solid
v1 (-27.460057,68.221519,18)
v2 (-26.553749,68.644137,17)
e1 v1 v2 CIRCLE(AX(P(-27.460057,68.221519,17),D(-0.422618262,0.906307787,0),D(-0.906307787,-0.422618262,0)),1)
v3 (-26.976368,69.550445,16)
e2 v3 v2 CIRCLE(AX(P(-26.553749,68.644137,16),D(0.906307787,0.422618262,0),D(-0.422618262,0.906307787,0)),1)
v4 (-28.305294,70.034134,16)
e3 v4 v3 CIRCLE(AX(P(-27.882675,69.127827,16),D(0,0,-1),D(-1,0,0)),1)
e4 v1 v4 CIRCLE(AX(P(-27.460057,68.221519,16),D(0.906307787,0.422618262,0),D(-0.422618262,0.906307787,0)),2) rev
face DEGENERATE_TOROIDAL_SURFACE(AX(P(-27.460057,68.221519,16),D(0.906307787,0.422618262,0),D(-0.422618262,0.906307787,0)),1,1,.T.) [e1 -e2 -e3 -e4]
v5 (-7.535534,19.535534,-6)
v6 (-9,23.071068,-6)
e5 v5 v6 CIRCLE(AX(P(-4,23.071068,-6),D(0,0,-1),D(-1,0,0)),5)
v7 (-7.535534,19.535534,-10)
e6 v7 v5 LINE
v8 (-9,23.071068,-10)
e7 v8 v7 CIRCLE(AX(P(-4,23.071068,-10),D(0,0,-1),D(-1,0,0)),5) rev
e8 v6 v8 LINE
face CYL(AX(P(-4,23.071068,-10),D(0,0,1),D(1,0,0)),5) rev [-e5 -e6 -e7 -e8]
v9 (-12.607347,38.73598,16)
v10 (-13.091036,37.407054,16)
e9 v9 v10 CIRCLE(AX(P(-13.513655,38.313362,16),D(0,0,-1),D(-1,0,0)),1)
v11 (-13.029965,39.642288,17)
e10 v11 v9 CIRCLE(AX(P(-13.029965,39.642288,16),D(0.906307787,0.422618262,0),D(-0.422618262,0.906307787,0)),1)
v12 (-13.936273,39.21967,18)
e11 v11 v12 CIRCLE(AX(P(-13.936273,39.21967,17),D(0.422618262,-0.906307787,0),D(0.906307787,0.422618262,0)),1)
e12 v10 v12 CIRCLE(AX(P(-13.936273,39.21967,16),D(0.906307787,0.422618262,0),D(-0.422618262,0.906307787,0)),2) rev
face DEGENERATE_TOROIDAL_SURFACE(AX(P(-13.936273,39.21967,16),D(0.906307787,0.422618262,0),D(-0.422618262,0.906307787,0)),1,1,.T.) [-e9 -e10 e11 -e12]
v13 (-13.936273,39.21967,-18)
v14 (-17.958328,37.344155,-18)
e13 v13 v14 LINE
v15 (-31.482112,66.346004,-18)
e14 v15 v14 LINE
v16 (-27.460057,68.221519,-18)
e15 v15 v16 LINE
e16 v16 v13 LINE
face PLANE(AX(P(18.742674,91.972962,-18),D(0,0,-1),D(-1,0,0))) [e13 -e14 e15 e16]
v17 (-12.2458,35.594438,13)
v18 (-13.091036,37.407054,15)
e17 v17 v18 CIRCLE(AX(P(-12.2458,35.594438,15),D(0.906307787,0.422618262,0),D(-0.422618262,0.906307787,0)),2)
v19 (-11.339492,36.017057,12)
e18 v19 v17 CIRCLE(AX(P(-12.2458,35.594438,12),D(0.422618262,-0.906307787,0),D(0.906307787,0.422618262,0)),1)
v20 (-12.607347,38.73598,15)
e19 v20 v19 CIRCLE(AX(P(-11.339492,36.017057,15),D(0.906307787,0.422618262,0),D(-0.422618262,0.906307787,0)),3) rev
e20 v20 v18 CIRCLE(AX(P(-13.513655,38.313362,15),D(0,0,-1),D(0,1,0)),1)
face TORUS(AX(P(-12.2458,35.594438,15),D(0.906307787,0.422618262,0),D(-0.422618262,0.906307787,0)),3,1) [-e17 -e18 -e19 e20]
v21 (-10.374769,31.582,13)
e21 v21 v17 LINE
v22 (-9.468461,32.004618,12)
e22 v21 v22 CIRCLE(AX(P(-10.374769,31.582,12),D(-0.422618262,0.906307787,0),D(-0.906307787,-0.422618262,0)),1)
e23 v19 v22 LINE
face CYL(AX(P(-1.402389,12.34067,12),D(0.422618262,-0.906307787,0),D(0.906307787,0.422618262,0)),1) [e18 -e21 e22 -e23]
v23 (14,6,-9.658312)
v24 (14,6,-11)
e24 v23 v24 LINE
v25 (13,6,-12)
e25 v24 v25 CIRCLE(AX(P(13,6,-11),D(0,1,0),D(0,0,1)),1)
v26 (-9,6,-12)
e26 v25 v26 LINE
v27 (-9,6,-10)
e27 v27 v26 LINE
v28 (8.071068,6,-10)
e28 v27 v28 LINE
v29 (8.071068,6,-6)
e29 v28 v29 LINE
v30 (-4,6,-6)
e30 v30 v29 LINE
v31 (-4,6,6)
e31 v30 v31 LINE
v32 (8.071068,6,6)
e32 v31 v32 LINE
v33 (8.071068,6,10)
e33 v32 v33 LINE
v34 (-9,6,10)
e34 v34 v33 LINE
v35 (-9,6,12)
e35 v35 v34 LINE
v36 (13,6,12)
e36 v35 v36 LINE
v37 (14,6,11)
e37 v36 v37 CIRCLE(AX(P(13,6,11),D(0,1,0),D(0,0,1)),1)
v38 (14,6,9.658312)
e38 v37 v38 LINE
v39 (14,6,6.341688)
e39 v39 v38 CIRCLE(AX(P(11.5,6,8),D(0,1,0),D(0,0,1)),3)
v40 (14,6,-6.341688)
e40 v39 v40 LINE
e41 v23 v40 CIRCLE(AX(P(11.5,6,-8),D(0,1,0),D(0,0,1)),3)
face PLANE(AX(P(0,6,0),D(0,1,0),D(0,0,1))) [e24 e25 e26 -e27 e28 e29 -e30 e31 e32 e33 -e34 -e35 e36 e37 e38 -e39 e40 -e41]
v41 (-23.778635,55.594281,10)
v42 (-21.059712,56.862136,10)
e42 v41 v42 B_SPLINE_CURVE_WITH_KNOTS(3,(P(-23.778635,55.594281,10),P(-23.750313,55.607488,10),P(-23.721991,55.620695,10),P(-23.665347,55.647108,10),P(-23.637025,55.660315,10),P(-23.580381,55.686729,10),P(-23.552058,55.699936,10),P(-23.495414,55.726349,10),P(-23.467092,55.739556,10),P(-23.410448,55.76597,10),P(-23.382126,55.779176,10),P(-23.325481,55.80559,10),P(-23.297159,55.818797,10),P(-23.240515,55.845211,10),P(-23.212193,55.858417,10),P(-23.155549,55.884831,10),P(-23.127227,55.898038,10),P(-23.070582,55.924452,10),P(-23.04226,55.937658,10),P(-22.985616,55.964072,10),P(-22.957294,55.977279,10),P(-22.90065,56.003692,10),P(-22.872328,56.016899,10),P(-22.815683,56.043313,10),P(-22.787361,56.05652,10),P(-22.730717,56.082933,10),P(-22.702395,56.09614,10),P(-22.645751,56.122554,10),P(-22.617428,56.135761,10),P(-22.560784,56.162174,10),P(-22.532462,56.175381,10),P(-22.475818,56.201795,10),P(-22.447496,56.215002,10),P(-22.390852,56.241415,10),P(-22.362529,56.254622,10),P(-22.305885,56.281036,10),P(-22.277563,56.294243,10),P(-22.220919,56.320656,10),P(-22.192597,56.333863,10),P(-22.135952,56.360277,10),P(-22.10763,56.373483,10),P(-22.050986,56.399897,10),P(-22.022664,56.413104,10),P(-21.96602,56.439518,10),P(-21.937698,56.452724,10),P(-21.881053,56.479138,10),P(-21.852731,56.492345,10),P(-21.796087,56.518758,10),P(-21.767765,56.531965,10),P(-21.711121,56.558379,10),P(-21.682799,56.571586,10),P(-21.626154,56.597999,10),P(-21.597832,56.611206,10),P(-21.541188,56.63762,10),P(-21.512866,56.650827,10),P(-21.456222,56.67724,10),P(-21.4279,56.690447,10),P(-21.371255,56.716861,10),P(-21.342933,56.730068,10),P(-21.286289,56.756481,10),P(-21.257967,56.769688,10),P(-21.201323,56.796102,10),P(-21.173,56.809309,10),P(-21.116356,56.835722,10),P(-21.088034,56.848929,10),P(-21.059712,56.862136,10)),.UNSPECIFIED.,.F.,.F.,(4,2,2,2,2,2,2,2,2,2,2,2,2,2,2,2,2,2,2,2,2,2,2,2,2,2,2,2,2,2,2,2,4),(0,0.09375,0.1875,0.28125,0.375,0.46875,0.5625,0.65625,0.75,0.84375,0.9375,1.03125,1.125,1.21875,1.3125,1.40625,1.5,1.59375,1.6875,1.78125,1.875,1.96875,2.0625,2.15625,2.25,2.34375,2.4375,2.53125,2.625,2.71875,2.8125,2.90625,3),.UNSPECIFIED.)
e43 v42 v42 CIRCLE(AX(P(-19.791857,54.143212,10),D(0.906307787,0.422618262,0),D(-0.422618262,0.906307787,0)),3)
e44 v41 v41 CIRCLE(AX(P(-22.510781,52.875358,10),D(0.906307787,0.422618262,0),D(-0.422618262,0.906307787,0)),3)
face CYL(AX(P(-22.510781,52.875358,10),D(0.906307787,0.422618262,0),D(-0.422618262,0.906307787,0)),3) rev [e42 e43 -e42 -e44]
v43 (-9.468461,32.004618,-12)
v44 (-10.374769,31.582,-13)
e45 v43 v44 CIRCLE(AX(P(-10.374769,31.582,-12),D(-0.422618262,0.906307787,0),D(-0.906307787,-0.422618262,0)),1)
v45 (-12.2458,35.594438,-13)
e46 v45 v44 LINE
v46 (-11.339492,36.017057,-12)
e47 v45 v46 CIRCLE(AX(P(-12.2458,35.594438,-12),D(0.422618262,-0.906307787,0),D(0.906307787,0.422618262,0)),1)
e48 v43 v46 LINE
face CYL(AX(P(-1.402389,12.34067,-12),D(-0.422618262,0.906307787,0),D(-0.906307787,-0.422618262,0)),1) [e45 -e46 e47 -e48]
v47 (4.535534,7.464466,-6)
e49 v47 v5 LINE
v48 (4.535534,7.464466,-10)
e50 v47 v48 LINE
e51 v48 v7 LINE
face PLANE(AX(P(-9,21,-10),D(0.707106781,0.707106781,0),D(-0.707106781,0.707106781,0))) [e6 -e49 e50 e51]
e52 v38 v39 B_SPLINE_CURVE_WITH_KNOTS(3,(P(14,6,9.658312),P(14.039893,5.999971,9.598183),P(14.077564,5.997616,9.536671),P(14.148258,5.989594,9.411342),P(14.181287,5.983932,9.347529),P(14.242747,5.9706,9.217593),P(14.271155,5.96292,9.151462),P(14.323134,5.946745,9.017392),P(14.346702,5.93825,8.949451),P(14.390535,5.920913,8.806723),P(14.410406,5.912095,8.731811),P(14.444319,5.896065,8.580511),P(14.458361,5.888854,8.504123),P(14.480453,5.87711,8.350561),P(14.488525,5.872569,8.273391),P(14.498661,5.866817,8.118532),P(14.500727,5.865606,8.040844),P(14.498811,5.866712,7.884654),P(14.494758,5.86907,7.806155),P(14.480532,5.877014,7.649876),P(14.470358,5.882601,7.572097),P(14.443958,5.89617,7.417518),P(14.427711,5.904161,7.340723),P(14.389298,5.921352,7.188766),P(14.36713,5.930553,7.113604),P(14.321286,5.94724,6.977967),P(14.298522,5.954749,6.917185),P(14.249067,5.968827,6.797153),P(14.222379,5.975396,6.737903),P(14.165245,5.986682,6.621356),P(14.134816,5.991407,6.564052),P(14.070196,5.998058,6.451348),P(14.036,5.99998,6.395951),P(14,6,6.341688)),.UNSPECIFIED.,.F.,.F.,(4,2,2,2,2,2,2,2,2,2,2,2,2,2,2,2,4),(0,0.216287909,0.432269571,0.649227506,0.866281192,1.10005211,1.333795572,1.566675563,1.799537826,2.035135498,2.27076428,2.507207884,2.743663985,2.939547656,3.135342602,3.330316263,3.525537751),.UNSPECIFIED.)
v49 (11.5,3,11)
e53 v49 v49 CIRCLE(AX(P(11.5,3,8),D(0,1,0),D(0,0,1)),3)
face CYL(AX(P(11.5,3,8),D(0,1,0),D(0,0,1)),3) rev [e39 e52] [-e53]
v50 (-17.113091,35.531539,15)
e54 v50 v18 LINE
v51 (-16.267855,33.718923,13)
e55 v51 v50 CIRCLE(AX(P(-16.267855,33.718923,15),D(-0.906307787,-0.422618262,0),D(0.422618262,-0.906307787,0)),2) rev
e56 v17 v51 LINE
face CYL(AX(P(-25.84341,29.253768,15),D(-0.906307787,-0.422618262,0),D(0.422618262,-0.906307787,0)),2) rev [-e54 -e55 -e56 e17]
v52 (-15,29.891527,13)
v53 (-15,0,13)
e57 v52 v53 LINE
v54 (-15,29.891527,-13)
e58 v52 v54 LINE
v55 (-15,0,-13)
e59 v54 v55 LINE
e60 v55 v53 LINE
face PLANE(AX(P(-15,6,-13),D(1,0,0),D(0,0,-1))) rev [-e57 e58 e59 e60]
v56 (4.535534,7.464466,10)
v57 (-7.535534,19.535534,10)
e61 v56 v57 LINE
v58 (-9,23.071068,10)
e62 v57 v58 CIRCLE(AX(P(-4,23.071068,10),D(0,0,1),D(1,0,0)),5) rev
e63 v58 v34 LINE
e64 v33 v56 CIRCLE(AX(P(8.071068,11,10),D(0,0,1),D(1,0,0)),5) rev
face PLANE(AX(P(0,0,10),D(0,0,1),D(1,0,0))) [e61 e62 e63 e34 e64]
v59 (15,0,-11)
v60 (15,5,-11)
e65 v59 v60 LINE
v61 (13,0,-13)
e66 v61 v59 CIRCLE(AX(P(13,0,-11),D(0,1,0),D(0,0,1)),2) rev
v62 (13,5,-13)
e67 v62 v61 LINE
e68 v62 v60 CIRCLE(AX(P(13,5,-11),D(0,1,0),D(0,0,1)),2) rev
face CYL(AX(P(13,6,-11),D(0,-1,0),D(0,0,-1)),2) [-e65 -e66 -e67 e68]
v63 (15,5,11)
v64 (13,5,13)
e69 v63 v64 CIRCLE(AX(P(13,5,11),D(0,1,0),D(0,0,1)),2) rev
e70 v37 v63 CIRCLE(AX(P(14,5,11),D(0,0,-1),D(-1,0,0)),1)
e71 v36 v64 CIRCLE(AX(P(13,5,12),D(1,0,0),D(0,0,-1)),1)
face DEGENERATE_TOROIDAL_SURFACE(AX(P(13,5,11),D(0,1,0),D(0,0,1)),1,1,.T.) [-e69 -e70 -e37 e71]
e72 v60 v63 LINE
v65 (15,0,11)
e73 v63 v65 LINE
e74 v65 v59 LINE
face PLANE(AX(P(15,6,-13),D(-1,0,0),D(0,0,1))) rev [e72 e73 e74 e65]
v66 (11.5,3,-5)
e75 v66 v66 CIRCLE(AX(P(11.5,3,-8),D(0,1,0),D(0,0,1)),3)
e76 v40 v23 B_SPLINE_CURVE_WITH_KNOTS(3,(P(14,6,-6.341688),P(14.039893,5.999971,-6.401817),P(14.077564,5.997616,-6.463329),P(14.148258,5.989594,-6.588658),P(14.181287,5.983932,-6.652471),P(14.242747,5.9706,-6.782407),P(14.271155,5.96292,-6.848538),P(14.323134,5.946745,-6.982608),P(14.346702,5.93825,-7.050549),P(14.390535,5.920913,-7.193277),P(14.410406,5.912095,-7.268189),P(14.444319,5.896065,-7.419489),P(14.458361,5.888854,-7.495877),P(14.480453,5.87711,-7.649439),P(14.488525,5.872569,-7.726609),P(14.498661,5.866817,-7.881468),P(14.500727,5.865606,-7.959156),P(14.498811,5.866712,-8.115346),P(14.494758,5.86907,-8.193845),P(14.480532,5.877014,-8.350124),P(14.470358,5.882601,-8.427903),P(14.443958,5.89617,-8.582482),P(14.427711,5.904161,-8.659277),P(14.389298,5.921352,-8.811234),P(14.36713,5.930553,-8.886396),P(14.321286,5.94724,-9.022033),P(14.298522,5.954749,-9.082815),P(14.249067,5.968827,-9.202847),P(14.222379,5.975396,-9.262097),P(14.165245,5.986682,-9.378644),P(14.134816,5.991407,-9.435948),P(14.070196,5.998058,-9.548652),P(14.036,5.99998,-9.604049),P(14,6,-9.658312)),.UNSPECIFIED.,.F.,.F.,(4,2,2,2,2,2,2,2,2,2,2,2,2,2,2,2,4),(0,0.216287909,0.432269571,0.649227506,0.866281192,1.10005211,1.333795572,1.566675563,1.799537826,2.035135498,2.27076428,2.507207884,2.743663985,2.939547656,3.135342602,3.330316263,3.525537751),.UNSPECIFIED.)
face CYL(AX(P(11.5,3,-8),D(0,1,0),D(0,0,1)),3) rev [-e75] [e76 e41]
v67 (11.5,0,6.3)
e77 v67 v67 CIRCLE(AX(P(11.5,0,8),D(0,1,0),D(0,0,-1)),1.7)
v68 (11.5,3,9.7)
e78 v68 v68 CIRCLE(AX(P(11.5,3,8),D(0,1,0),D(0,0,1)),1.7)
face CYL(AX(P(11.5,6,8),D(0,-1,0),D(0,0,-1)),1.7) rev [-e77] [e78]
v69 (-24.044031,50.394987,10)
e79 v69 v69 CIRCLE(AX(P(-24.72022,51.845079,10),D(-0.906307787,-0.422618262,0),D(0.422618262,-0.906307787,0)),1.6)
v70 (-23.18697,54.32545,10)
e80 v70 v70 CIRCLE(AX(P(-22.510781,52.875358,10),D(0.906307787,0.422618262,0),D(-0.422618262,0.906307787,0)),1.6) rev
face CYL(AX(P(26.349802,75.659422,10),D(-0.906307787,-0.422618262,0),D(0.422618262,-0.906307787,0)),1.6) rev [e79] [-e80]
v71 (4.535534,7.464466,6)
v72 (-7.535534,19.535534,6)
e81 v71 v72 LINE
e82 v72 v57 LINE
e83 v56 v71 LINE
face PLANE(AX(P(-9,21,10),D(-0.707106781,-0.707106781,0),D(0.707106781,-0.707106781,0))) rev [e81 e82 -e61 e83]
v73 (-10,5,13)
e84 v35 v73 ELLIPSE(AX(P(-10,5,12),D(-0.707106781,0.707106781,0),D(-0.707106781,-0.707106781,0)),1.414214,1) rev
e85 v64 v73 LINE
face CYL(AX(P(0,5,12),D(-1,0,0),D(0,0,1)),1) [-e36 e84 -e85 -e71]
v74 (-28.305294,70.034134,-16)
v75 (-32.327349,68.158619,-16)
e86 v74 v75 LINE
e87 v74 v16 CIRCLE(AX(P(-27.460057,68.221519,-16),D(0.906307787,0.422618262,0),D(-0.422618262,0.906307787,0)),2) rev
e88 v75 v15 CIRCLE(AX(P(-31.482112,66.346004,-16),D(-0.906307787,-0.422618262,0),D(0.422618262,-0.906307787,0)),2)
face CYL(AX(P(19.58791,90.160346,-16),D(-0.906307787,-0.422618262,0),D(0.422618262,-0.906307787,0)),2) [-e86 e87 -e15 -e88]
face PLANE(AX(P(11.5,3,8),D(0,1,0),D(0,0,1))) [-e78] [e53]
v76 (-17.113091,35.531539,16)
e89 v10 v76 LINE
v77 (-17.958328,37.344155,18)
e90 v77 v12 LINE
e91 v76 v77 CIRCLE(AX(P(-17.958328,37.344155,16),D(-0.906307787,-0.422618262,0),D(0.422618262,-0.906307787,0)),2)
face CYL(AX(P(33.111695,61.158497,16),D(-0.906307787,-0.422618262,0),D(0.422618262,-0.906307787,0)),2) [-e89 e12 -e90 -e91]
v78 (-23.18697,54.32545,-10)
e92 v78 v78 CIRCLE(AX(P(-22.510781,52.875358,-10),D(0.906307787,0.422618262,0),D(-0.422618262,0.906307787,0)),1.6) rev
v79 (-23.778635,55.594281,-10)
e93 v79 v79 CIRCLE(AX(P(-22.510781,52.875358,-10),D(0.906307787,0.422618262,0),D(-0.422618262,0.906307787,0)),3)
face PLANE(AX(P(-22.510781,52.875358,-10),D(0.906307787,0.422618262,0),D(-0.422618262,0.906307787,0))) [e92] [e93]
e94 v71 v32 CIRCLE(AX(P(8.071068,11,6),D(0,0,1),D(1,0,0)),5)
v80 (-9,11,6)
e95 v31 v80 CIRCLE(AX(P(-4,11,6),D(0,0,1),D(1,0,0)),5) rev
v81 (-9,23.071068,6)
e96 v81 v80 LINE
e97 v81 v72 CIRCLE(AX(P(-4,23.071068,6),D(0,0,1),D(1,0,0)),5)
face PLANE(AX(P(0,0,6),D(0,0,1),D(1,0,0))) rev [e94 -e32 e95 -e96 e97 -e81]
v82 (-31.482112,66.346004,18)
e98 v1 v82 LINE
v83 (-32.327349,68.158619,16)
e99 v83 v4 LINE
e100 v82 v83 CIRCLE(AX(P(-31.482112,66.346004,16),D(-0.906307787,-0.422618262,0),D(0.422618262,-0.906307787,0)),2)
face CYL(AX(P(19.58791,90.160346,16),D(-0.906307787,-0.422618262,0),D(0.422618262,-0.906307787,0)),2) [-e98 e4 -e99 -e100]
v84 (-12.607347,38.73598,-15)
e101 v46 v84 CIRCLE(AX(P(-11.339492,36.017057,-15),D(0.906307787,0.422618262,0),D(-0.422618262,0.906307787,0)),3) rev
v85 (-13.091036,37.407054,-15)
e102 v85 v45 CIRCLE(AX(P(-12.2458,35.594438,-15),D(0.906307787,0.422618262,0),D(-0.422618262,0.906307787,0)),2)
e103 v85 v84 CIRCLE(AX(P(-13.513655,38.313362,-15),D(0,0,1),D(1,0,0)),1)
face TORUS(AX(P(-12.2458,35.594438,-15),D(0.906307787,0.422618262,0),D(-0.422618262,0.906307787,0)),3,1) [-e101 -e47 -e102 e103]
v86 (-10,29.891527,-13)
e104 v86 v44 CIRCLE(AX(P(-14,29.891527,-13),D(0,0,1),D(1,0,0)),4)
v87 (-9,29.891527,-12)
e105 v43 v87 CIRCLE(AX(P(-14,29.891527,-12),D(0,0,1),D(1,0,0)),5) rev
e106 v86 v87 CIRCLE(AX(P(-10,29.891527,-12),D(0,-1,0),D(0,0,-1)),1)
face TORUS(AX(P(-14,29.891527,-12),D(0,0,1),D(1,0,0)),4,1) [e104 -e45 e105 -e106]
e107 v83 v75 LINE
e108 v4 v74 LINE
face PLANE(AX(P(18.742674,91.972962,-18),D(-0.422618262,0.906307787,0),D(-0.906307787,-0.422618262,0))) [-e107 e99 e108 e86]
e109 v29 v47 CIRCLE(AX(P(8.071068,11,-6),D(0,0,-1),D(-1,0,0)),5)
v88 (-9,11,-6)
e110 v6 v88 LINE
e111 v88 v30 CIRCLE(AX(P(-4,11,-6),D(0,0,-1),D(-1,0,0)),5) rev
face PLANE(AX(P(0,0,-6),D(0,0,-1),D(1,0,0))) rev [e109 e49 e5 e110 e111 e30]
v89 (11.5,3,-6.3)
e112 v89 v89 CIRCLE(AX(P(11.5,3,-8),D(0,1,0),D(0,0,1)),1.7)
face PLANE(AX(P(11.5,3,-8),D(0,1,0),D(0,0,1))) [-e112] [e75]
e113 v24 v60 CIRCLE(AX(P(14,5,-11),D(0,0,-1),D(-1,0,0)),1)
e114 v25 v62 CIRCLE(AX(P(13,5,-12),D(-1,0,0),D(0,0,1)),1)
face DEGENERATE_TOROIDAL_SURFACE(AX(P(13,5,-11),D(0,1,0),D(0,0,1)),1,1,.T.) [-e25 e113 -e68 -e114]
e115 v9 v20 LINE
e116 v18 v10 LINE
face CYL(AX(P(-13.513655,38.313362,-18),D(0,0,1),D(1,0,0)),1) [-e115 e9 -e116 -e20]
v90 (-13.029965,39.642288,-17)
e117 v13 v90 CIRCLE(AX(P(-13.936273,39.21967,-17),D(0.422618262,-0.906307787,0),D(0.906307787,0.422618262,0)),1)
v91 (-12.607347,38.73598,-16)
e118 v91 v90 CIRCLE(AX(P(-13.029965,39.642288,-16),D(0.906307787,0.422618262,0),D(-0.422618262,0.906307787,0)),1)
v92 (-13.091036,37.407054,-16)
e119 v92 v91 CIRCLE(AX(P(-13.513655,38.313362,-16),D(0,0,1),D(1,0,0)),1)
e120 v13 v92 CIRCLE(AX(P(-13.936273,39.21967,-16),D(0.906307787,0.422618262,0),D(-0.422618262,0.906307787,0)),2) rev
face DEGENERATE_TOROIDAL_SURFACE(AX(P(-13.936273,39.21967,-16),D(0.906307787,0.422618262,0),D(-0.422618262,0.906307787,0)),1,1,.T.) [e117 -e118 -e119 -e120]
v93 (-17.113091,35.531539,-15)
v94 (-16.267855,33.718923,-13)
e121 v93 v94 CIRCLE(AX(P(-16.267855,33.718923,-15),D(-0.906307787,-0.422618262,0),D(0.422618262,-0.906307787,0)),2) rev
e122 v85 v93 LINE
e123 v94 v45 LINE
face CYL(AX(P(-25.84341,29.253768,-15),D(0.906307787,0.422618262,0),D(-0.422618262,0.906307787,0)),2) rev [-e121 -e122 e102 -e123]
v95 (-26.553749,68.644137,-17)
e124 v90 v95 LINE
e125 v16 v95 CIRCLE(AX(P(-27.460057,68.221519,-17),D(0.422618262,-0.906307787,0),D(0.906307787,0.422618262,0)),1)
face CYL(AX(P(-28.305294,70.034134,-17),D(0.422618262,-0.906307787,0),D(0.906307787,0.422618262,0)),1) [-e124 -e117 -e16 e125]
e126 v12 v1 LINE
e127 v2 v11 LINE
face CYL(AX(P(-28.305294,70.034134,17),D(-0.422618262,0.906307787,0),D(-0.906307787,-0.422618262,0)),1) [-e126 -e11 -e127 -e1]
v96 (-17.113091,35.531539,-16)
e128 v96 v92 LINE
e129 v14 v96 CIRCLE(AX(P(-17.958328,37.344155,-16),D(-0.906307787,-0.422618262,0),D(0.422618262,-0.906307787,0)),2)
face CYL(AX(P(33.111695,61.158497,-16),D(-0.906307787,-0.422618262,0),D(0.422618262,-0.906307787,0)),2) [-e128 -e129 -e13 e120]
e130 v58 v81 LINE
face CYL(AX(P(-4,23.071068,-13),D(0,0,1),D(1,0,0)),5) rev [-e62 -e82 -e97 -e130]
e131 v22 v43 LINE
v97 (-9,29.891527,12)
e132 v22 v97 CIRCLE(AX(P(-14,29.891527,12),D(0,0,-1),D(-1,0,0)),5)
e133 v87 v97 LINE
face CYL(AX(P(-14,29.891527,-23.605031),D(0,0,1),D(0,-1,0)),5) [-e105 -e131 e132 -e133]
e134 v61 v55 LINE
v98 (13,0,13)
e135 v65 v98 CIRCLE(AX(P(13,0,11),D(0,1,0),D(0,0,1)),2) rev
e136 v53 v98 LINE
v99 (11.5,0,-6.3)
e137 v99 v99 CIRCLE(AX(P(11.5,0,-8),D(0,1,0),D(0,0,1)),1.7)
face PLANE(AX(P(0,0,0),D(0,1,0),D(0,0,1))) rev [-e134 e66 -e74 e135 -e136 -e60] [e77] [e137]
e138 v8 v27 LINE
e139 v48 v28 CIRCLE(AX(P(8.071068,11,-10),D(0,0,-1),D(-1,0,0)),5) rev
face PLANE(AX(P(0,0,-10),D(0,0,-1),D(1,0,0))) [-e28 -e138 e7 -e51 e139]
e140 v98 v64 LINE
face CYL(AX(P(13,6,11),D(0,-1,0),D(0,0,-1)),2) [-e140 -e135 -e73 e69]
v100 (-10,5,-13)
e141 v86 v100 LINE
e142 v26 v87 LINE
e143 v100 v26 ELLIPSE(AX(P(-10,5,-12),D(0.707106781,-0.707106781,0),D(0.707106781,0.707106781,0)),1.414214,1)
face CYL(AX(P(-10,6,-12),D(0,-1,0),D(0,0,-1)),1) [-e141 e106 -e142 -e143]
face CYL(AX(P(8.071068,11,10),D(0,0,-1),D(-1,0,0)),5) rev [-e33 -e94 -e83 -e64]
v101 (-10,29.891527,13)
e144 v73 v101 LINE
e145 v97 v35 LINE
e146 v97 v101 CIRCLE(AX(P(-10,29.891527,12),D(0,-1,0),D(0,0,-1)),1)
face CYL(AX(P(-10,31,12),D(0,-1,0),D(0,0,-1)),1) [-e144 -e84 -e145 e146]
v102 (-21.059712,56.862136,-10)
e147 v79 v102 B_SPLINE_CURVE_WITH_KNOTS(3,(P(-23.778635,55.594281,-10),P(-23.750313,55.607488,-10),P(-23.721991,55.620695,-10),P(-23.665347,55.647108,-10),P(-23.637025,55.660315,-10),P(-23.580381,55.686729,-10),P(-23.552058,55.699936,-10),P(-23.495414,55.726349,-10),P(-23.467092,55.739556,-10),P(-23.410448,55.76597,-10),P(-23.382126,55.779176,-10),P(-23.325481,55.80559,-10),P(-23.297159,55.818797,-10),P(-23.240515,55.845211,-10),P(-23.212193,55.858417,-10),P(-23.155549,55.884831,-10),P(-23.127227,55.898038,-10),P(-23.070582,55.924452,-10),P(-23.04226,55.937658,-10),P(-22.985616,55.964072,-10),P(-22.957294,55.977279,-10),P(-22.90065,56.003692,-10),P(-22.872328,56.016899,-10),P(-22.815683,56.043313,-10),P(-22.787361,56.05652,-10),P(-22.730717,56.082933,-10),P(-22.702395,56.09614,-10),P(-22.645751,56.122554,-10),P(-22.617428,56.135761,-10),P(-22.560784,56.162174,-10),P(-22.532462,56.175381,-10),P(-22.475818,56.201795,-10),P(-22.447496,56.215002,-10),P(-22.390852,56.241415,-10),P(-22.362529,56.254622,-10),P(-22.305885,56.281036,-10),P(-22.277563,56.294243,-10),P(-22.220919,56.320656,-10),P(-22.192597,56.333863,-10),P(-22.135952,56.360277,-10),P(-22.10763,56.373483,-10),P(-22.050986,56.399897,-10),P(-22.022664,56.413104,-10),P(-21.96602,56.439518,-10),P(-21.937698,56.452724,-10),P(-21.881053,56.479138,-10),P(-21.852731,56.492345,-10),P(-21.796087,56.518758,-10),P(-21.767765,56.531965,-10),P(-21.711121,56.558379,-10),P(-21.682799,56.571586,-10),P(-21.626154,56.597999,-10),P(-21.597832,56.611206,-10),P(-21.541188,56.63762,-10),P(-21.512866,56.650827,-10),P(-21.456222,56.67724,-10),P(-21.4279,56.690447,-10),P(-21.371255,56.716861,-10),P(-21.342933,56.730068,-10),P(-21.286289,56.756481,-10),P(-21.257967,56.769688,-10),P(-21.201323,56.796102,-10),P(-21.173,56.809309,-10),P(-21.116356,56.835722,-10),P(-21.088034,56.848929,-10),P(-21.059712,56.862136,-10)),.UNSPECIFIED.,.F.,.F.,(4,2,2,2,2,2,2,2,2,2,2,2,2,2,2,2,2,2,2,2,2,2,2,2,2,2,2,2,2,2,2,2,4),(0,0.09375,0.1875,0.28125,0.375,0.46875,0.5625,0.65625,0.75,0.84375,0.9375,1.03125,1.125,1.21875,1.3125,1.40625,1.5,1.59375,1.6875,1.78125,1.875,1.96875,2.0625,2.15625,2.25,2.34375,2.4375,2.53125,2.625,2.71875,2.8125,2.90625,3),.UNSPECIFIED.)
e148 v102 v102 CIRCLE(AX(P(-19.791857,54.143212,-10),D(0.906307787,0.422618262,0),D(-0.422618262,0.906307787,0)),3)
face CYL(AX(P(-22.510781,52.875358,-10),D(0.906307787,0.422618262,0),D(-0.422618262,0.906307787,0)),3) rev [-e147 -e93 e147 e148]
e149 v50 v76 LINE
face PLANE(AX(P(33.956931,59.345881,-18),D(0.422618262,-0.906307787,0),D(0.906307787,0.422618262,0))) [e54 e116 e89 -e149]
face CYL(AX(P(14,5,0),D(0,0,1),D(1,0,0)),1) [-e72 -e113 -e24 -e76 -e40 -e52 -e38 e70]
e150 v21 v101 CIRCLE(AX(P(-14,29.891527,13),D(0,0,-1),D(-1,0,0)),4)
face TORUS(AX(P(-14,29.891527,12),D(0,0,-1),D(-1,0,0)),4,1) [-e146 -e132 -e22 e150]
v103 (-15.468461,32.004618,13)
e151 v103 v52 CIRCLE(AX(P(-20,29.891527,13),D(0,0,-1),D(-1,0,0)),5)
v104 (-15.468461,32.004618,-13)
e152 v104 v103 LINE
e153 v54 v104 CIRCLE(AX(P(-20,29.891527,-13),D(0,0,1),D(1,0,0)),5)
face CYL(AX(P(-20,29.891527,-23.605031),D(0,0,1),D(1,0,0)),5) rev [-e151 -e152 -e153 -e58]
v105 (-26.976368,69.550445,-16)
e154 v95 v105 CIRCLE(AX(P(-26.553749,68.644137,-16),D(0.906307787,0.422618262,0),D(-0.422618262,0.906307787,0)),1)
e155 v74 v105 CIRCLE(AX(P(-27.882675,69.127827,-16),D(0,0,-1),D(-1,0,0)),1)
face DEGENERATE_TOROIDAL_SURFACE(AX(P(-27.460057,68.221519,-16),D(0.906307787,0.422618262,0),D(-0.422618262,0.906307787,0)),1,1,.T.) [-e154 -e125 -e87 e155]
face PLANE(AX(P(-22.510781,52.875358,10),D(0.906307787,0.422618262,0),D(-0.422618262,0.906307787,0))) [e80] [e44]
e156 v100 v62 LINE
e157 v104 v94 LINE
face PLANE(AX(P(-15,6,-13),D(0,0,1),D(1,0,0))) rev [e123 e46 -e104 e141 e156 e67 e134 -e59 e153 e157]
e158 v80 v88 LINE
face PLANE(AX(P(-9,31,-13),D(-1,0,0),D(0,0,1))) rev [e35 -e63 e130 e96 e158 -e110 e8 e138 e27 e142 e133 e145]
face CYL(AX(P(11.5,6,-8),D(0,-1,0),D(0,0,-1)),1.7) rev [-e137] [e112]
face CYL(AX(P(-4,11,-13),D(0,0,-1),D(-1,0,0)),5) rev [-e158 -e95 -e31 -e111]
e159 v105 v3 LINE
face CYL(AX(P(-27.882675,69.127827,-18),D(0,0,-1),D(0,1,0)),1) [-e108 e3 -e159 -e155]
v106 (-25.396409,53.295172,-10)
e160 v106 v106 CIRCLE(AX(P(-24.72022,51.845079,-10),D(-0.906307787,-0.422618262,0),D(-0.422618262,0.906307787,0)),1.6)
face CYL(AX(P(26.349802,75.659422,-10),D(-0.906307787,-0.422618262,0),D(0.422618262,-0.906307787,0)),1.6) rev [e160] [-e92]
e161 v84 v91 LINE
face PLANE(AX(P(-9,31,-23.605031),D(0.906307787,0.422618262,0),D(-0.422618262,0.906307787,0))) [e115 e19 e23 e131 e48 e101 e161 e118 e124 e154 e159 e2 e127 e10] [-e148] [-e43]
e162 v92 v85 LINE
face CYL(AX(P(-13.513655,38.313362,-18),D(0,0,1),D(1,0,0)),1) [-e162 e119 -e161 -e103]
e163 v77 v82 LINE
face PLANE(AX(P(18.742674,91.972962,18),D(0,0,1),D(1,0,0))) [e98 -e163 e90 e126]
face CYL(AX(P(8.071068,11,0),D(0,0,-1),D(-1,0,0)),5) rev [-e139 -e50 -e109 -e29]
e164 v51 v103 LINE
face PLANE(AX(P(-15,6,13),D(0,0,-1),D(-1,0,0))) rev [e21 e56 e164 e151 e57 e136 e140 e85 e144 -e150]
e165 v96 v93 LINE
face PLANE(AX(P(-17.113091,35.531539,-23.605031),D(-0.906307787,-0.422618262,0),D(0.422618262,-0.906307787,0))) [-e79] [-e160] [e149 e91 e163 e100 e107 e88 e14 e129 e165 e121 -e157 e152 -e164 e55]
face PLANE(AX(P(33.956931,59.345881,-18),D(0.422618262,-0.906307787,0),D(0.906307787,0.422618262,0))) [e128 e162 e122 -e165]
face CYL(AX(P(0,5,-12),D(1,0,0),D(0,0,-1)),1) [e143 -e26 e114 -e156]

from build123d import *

# Parameters (mm, degrees)
SKETCH_1_W          = 30
SKETCH_1_H          = 26
SKETCH_1_R          = 1.7
EXTRUDE_1_DEPTH     = 6
SKETCH_15_W         = 6
SKETCH_15_H         = 26
EXTRUDE_4_DEPTH     = 25
EXTRUDE_5_DEPTH     = 26
SKETCH_17_W         = 36
SKETCH_17_H         = 36
SKETCH_17_R         = 1.6
EXTRUDE_6_DEPTH     = 5.437846722
FILLET_3_R          = 2
SKETCH_18_R         = 3
CUT_EXTRUDE_4_DEPTH = 3
SKETCH_19_R         = 3
CUT_EXTRUDE_5_DEPTH = 3
FILLET_4_R          = 1
FILLET_6_R          = 5
EXTRUDE_7_DEPTH     = 2
FILLET_7_R          = 5
FILLET_8_R          = 5


with BuildPart() as part:
    # 草图1 → 凸台-拉伸1 (new body)
    with BuildSketch(Plane(origin=(0, 0, 0), x_dir=(1, 0, 0), z_dir=(0, 1, 0))):
        Rectangle(SKETCH_1_W, SKETCH_1_H)
        with Locations(Location((11.5, 8, 0), (0, 0, 270))):
            Circle(SKETCH_1_R, mode=Mode.SUBTRACT)
        with Locations(Location((11.5, -8, 0), (0, 0, 90))):
            Circle(SKETCH_1_R, mode=Mode.SUBTRACT)
    extrude(amount=EXTRUDE_1_DEPTH)

    # 草图15 → 凸台-拉伸4 (add)
    with BuildSketch(Plane(origin=(0, 6, 0), x_dir=(1, 0, 0), z_dir=(0, 1, 0))):
        with Locations((-12, 0)):
            Rectangle(SKETCH_15_W, SKETCH_15_H)
    extrude(amount=EXTRUDE_4_DEPTH)

    # 草图16 → 凸台-拉伸5 (add)
    with BuildSketch(Plane.XY.offset(13)):
        Polygon((-9, 31), (-12.18472848, 37.829672265), (-17.113091309, 35.531538935), (-15, 31), align=None)
    extrude(amount=-EXTRUDE_5_DEPTH)

    # 草图17 → 凸台-拉伸6 (add)
    with BuildSketch(Plane(origin=(-0.447218204, -0.208541274, 0), x_dir=(0, 0, 1), z_dir=(-0.906307787036653, -0.4226182617406928, 0))):
        with Locations((0, 57.434815324)):
            Rectangle(SKETCH_17_W, SKETCH_17_H)
        with Locations(Location((10, 57.434815324, 0), (0, 0, 270))):
            Circle(SKETCH_17_R, mode=Mode.SUBTRACT)
        with Locations(Location((-10, 57.434815324, 0), (0, 0, 90))):
            Circle(SKETCH_17_R, mode=Mode.SUBTRACT)
    extrude(amount=-EXTRUDE_6_DEPTH)

    # 圆角3
    fillet_3_edges = [part.edges().sort_by_distance(p)[0] for p in [
        (-14.648909894, 36.6806056, 13),
        (-14.648909894, 36.6806056, -13),
        (-14.648909894, 36.6806056, 18),
        (-29.863167317, 69.307685933, 18),
        (-14.648909894, 36.6806056, -18),
        (-29.863167317, 69.307685933, -18),
        (15, 3, 13),
        (15, 3, -13),
    ]]
    fillet(fillet_3_edges, radius=FILLET_3_R)

    # 草图18 → 切除-拉伸4 (cut)
    with BuildSketch(Plane(origin=(4.481144625, 2.089592056, 0), x_dir=(0, 0, -1), z_dir=(0.9063077870366527, 0.42261826174069367, 0))):
        with Locations(Location((-10, 57.434815324, 0), (0, 0, 90))):
            Circle(SKETCH_18_R)
        with Locations(Location((10, 57.434815324, 0), (0, 0, 90))):
            Circle(SKETCH_18_R)
    extrude(amount=-CUT_EXTRUDE_4_DEPTH, mode=Mode.SUBTRACT)

    # 草图19 → 切除-拉伸5 (cut)
    with BuildSketch(Plane(origin=(0, 6, 0), x_dir=(1, 0, 0), z_dir=(0, 1, 0))):
        with Locations(Location((11.5, 8, 0), (0, 0, 270))):
            Circle(SKETCH_19_R)
        with Locations(Location((11.5, -8, 0), (0, 0, 270))):
            Circle(SKETCH_19_R)
    extrude(amount=-CUT_EXTRUDE_5_DEPTH, mode=Mode.SUBTRACT)

    # 圆角4
    # the kernel refuses this fillet: 1 mm, written as the material it takes off along each edge
    with BuildSketch(Plane(origin=(13, 6, 13), x_dir=(0, -1, 0), z_dir=(-1, 0, 0)), Plane(origin=(-9, 6, -13), x_dir=(0, -1, 0), z_dir=(1, 0, 0))) as fillet_4_piece_1:
        with BuildLine():
            CenterArc((FILLET_4_R, -FILLET_4_R), FILLET_4_R, 90, 90)
            Line((0, -FILLET_4_R), (0, 0))
            Line((0, 0), (FILLET_4_R, 0))
        make_face()
    extrude(amount=22, mode=Mode.SUBTRACT)
    with BuildSketch(Plane(origin=(-9, 6, 13), x_dir=(-1, 0, 0), z_dir=(0, 1, 0))) as fillet_4_piece_2:
        with BuildLine():
            CenterArc((FILLET_4_R, -FILLET_4_R), FILLET_4_R, 90, 90)
            Line((0, -FILLET_4_R), (0, 0))
            Line((0, 0), (FILLET_4_R, 0))
        make_face()
    extrude(amount=27.5, mode=Mode.SUBTRACT)
    with BuildSketch(Plane(origin=(-9, 6, -13), x_dir=(-1, 0, 0), z_dir=(0, 1, 0))) as fillet_4_piece_3:
        with BuildLine():
            CenterArc((FILLET_4_R, FILLET_4_R), FILLET_4_R, 180, 90)
            Line((0, FILLET_4_R), (0, 0))
            Line((0, 0), (FILLET_4_R, 0))
        make_face()
    extrude(amount=27.5, mode=Mode.SUBTRACT)
    with BuildSketch(Plane(origin=(-7.943454346, 28.734230532, 13), x_dir=(0, 0, -1), z_dir=(-0.4226182617406934, 0.9063077870366528, 0))) as fillet_4_piece_4:
        with BuildLine():
            CenterArc((FILLET_4_R, FILLET_4_R), FILLET_4_R, 180, 90)
            Line((0, FILLET_4_R), (0, 0))
            Line((0, 0), (FILLET_4_R, 0))
        make_face()
    extrude(amount=8.035709571, mode=Mode.SUBTRACT)
    with BuildSketch(Plane(origin=(-7.943454346, 28.734230532, -13), x_dir=(0, 0, 1), z_dir=(-0.4226182617406934, 0.9063077870366528, 0))) as fillet_4_piece_5:
        with BuildLine():
            CenterArc((FILLET_4_R, -FILLET_4_R), FILLET_4_R, 90, 90)
            Line((0, -FILLET_4_R), (0, 0))
            Line((0, 0), (FILLET_4_R, 0))
        make_face()
    extrude(amount=8.035709571, mode=Mode.SUBTRACT)
    with BuildSketch(Plane(origin=(15, 6, -11), x_dir=(-1, 0, 0), z_dir=(0, 0, 1))) as fillet_4_piece_6:
        with BuildLine():
            CenterArc((FILLET_4_R, FILLET_4_R), FILLET_4_R, 180, 90)
            Line((0, FILLET_4_R), (0, 0))
            Line((0, 0), (FILLET_4_R, 0))
        make_face()
    extrude(amount=22, mode=Mode.SUBTRACT)
    with BuildSketch(Plane(origin=(13, 6, 11), x_dir=(0, 0, 1), z_dir=(-1, 0, 0))) as fillet_4_piece_7:
        with BuildLine():
            CenterArc((2 - FILLET_4_R, -FILLET_4_R), FILLET_4_R, 0, 90)
            Line((2, -FILLET_4_R), (2, 0))
            Line((2, 0), (2 - FILLET_4_R, 0))
        make_face()
    revolve(axis=Axis((13, 6, 11), (0, 1, 0)), revolution_arc=90, mode=Mode.SUBTRACT)
    with BuildSketch(Plane(origin=(13, 6, -11), x_dir=(0, 0, -1), z_dir=(-1, 0, 0))) as fillet_4_piece_8:
        with BuildLine():
            CenterArc((2 - FILLET_4_R, FILLET_4_R), FILLET_4_R, 270, 90)
            Line((2 - FILLET_4_R, 0), (2, 0))
            Line((2, 0), (2, FILLET_4_R))
        make_face()
    revolve(axis=Axis((13, 6, -11), (0, -1, 0)), revolution_arc=90, mode=Mode.SUBTRACT)
    with BuildSketch(Plane(origin=(-12.18472848, 37.829672264, -15), x_dir=(-0.42261826174069467, 0.9063077870366523, 0), z_dir=(0, 0, -1)), Plane(origin=(-12.18472848, 37.829672264, 16), x_dir=(-0.42261826174069467, 0.9063077870366523, 0), z_dir=(0, 0, -1))) as fillet_4_piece_9:
        with BuildLine():
            CenterArc((FILLET_4_R, -FILLET_4_R), FILLET_4_R, 90, 90)
            Line((0, -FILLET_4_R), (0, 0))
            Line((0, 0), (FILLET_4_R, 0))
        make_face()
    extrude(amount=1, mode=Mode.SUBTRACT)
    with BuildSketch(Plane(origin=(-26.553749379, 68.644137024, 18), x_dir=(0, 0, -1), z_dir=(0.4226182617406928, -0.906307787036653, 0)), Plane(origin=(-13.029965003, 39.642287839, -18), x_dir=(0, 0, 1), z_dir=(-0.4226182617406928, 0.906307787036653, 0))) as fillet_4_piece_10:
        with BuildLine():
            CenterArc((FILLET_4_R, -FILLET_4_R), FILLET_4_R, 90, 90)
            Line((0, -FILLET_4_R), (0, 0))
            Line((0, 0), (FILLET_4_R, 0))
        make_face()
    extrude(amount=32, mode=Mode.SUBTRACT)
    with BuildSketch(Plane(origin=(-27.398985903, 70.456752598, -16), x_dir=(-0.9063077870366528, -0.4226182617406932, 0), z_dir=(0, 0, 1))) as fillet_4_piece_11:
        with BuildLine():
            CenterArc((FILLET_4_R, FILLET_4_R), FILLET_4_R, 180, 90)
            Line((0, FILLET_4_R), (0, 0))
            Line((0, 0), (FILLET_4_R, 0))
        make_face()
    extrude(amount=32, mode=Mode.SUBTRACT)
    with BuildSketch(Plane(origin=(-26.553749379, 68.644137024, -16), x_dir=(-0.42261826174069317, 0.9063077870366529, 0), z_dir=(0, 0, 1))) as fillet_4_piece_12:
        with BuildLine():
            CenterArc((2 - FILLET_4_R, FILLET_4_R), FILLET_4_R, 270, 90)
            Line((2 - FILLET_4_R, 0), (2, 0))
            Line((2, 0), (2, FILLET_4_R))
        make_face()
    revolve(axis=Axis((-26.553749379, 68.644137024, -16), (-0.906307787036653, -0.4226182617406928, 0)), revolution_arc=90, mode=Mode.SUBTRACT)
    with BuildSketch(Plane(origin=(-13.029965003, 39.642287839, -16), x_dir=(0, 0, -1), z_dir=(-0.4226182617406928, 0.906307787036653, 0))) as fillet_4_piece_13:
        with BuildLine():
            CenterArc((2 - FILLET_4_R, FILLET_4_R), FILLET_4_R, 270, 90)
            Line((2, FILLET_4_R), (2, 0))
            Line((2, 0), (2 - FILLET_4_R, 0))
        make_face()
    revolve(axis=Axis((-13.029965003, 39.642287839, -16), (-0.906307787036653, -0.4226182617406928, 0)), revolution_arc=90, mode=Mode.SUBTRACT)
    with BuildSketch(Plane(origin=(-13.029965003, 39.642287839, 16), x_dir=(0, 0, 1), z_dir=(-0.4226182617406928, 0.906307787036653, 0))) as fillet_4_piece_14:
        with BuildLine():
            CenterArc((2 - FILLET_4_R, -FILLET_4_R), FILLET_4_R, 360, 90)
            Line((2, -FILLET_4_R), (2, 0))
            Line((2, 0), (2 - FILLET_4_R, 0))
        make_face()
    revolve(axis=Axis((-13.029965003, 39.642287839, 16), (0.906307787036653, 0.4226182617406928, 0)), revolution_arc=90, mode=Mode.SUBTRACT)
    with BuildSketch(Plane(origin=(-26.553749379, 68.644137024, 16), x_dir=(-0.42261826174069317, 0.9063077870366529, 0), z_dir=(0, 0, -1))) as fillet_4_piece_15:
        with BuildLine():
            CenterArc((2 - FILLET_4_R, -FILLET_4_R), FILLET_4_R, 0, 90)
            Line((2 - FILLET_4_R, 0), (2, 0))
            Line((2, 0), (2, -FILLET_4_R))
        make_face()
    revolve(axis=Axis((-26.553749379, 68.644137024, 16), (0.906307787036653, 0.4226182617406928, 0)), revolution_arc=90, mode=Mode.SUBTRACT)
    with BuildSketch(Plane(origin=(-11.339491956, 36.01705669, -15), x_dir=(-0.42261826174069395, 0.9063077870366527, 0), z_dir=(0, 0, -1))) as fillet_4_piece_16:
        with BuildLine():
            CenterArc((2 + FILLET_4_R, -FILLET_4_R), FILLET_4_R, 90, 90)
            Line((2, -FILLET_4_R), (2, 0))
            Line((2, 0), (2 + FILLET_4_R, 0))
        make_face()
    revolve(axis=Axis((-11.339491956, 36.01705669, -15), (0.9063077870366527, 0.42261826174069356, 0)), revolution_arc=90, mode=Mode.SUBTRACT)
    with BuildSketch(Plane(origin=(-11.339491956, 36.01705669, 15), x_dir=(-0.42261826174069395, 0.9063077870366527, 0), z_dir=(0, 0, 1))) as fillet_4_piece_17:
        with BuildLine():
            CenterArc((2 + FILLET_4_R, FILLET_4_R), FILLET_4_R, 180, 90)
            Line((2, FILLET_4_R), (2, 0))
            Line((2, 0), (2 + FILLET_4_R, 0))
        make_face()
    revolve(axis=Axis((-11.339491956, 36.01705669, 15), (-0.9063077870366527, -0.42261826174069356, 0)), revolution_arc=90, mode=Mode.SUBTRACT)
    with BuildSketch(Plane(origin=(13, 6, 13), x_dir=(0, -1, 0), z_dir=(-1, 0, 0))) as fillet_4_piece_18a_section:
        with BuildLine():
            CenterArc((FILLET_4_R, -FILLET_4_R), FILLET_4_R, 90, 90)
            Line((0, -FILLET_4_R), (0, 0))
            Line((0, 0), (FILLET_4_R, 0))
        make_face()
    fillet_4_piece_18a = extrude(amount=24.5, mode=Mode.PRIVATE)
    fillet_4_piece_18a = split(fillet_4_piece_18a, bisect_by=Plane(origin=(-9, 5.773604886, 12.773604886), z_dir=(-1, 0, 0)), keep=Keep.TOP, mode=Mode.PRIVATE)
    with BuildSketch(Plane(origin=(-9, 3.5, 13), x_dir=(-1, 0, 0), z_dir=(0, 1, 0))) as fillet_4_piece_18b_section:
        with BuildLine():
            CenterArc((FILLET_4_R, -FILLET_4_R), FILLET_4_R, 90, 90)
            Line((0, -FILLET_4_R), (0, 0))
            Line((0, 0), (FILLET_4_R, 0))
        make_face()
    fillet_4_piece_18b = extrude(amount=30, mode=Mode.PRIVATE)
    fillet_4_piece_18b = split(fillet_4_piece_18b, bisect_by=Plane(origin=(-9.226395114, 6, 12.773604886), z_dir=(0, -1, 0)), keep=Keep.TOP, mode=Mode.PRIVATE)
    fillet_4_piece_18 = fillet_4_piece_18a & fillet_4_piece_18b
    add(fillet_4_piece_18, mode=Mode.SUBTRACT)
    with BuildSketch(Plane(origin=(-9, 3.5, -13), x_dir=(-1, 0, 0), z_dir=(0, 1, 0))) as fillet_4_piece_19a_section:
        with BuildLine():
            CenterArc((FILLET_4_R, FILLET_4_R), FILLET_4_R, 180, 90)
            Line((0, FILLET_4_R), (0, 0))
            Line((0, 0), (FILLET_4_R, 0))
        make_face()
    fillet_4_piece_19a = extrude(amount=30, mode=Mode.PRIVATE)
    fillet_4_piece_19a = split(fillet_4_piece_19a, bisect_by=Plane(origin=(-9.226395114, 6, -12.773604886), z_dir=(0, -1, 0)), keep=Keep.TOP, mode=Mode.PRIVATE)
    with BuildSketch(Plane(origin=(-11.5, 6, -13), x_dir=(0, -1, 0), z_dir=(1, 0, 0))) as fillet_4_piece_19b_section:
        with BuildLine():
            CenterArc((FILLET_4_R, -FILLET_4_R), FILLET_4_R, 90, 90)
            Line((0, -FILLET_4_R), (0, 0))
            Line((0, 0), (FILLET_4_R, 0))
        make_face()
    fillet_4_piece_19b = extrude(amount=24.5, mode=Mode.PRIVATE)
    fillet_4_piece_19b = split(fillet_4_piece_19b, bisect_by=Plane(origin=(-9, 5.773604886, -12.773604886), z_dir=(-1, 0, 0)), keep=Keep.TOP, mode=Mode.PRIVATE)
    fillet_4_piece_19 = fillet_4_piece_19a & fillet_4_piece_19b
    add(fillet_4_piece_19, mode=Mode.SUBTRACT)

    # 圆角6
    # the kernel refuses this fillet: 5 mm, written as the material it adds along each edge
    with BuildSketch(Plane(origin=(-15, 31, 13), x_dir=(0, -1, 0), z_dir=(0, 0, -1))) as fillet_6_piece_1:
        with BuildLine():
            CenterArc((FILLET_6_R * 0.221694662643, FILLET_6_R), FILLET_6_R, 245, 25)
            Line((-FILLET_6_R * 0.200923599098, FILLET_6_R * 0.0936922129633), (0, 0))
            Line((0, 0), (FILLET_6_R * 0.221694662643, 0))
        make_face()
    extrude(amount=26)
    # the kernel refuses this fillet: 5 mm, written as the material it takes off along each edge
    with BuildSketch(Plane(origin=(-14, 29.891526686, 13), x_dir=(1, 0, 0), z_dir=(0, -1, 0))) as fillet_6_2_piece_1:
        with BuildLine():
            CenterArc((4, -1), 1, 0, 90)
            Line((5, -1), (5, 0))
            Line((5, 0), (4, 0))
        make_face()
    revolve(axis=Axis((-14, 29.891526686, 13), (0, 0, 1)), revolution_arc=25, mode=Mode.SUBTRACT)
    with BuildSketch(Plane(origin=(-14, 29.891526686, -13), x_dir=(0.906307787036653, 0.4226182617406928, 0), z_dir=(-0.4226182617406928, 0.906307787036653, 0))) as fillet_6_2_piece_2:
        with BuildLine():
            CenterArc((4, -1), 1, 0, 90)
            Line((5, -1), (5, 0))
            Line((5, 0), (4, 0))
        make_face()
    revolve(axis=Axis((-14, 29.891526686, -13), (0, 0, -1)), revolution_arc=25, mode=Mode.SUBTRACT)
    with BuildSketch(Plane(origin=(-9, 30.999999999, -13), x_dir=(-0.422618261740692, 0.9063077870366535, 0), z_dir=(0, 0, 1))) as fillet_6_2_piece_3:
        with BuildLine():
            CenterArc((FILLET_6_R * 0.221694662643, FILLET_6_R), FILLET_6_R, 245, 25)
            Line((-FILLET_6_R * 0.200923599098, FILLET_6_R * 0.0936922129633), (0, 0))
            Line((0, 0), (FILLET_6_R * 0.221694662643, 0))
        make_face()
    extrude(amount=26, mode=Mode.SUBTRACT)

    # 草图20 → 凸台-拉伸7 (add, symmetric)
    with BuildSketch(Plane.XY.offset(8)):
        Polygon((-9, 21), (6, 6), (-9, 6), align=None)
    extrude_7 = extrude(amount=EXTRUDE_7_DEPTH, both=True)

    # 镜向1: 凸台-拉伸7 across plane
    add(extrude_7.mirror(Plane(origin=(0, 0, 0), x_dir=(1, 0, 0), z_dir=(0, 0, -1))))

    # 圆角7
    fillet_7_edges = [part.edges().sort_by_distance(p)[0] for p in [
        (-9, 21, 8),
        (6, 6, 8),
        (-9, 21, -8),
        (6, 6, -8),
    ]]
    fillet(fillet_7_edges, radius=FILLET_7_R)

    # 圆角8
    fillet_8_edges = [part.edges().sort_by_distance(p)[0] for p in [
        (-9, 6, 0),
    ]]
    fillet(fillet_8_edges, radius=FILLET_8_R)


solid = part.part
